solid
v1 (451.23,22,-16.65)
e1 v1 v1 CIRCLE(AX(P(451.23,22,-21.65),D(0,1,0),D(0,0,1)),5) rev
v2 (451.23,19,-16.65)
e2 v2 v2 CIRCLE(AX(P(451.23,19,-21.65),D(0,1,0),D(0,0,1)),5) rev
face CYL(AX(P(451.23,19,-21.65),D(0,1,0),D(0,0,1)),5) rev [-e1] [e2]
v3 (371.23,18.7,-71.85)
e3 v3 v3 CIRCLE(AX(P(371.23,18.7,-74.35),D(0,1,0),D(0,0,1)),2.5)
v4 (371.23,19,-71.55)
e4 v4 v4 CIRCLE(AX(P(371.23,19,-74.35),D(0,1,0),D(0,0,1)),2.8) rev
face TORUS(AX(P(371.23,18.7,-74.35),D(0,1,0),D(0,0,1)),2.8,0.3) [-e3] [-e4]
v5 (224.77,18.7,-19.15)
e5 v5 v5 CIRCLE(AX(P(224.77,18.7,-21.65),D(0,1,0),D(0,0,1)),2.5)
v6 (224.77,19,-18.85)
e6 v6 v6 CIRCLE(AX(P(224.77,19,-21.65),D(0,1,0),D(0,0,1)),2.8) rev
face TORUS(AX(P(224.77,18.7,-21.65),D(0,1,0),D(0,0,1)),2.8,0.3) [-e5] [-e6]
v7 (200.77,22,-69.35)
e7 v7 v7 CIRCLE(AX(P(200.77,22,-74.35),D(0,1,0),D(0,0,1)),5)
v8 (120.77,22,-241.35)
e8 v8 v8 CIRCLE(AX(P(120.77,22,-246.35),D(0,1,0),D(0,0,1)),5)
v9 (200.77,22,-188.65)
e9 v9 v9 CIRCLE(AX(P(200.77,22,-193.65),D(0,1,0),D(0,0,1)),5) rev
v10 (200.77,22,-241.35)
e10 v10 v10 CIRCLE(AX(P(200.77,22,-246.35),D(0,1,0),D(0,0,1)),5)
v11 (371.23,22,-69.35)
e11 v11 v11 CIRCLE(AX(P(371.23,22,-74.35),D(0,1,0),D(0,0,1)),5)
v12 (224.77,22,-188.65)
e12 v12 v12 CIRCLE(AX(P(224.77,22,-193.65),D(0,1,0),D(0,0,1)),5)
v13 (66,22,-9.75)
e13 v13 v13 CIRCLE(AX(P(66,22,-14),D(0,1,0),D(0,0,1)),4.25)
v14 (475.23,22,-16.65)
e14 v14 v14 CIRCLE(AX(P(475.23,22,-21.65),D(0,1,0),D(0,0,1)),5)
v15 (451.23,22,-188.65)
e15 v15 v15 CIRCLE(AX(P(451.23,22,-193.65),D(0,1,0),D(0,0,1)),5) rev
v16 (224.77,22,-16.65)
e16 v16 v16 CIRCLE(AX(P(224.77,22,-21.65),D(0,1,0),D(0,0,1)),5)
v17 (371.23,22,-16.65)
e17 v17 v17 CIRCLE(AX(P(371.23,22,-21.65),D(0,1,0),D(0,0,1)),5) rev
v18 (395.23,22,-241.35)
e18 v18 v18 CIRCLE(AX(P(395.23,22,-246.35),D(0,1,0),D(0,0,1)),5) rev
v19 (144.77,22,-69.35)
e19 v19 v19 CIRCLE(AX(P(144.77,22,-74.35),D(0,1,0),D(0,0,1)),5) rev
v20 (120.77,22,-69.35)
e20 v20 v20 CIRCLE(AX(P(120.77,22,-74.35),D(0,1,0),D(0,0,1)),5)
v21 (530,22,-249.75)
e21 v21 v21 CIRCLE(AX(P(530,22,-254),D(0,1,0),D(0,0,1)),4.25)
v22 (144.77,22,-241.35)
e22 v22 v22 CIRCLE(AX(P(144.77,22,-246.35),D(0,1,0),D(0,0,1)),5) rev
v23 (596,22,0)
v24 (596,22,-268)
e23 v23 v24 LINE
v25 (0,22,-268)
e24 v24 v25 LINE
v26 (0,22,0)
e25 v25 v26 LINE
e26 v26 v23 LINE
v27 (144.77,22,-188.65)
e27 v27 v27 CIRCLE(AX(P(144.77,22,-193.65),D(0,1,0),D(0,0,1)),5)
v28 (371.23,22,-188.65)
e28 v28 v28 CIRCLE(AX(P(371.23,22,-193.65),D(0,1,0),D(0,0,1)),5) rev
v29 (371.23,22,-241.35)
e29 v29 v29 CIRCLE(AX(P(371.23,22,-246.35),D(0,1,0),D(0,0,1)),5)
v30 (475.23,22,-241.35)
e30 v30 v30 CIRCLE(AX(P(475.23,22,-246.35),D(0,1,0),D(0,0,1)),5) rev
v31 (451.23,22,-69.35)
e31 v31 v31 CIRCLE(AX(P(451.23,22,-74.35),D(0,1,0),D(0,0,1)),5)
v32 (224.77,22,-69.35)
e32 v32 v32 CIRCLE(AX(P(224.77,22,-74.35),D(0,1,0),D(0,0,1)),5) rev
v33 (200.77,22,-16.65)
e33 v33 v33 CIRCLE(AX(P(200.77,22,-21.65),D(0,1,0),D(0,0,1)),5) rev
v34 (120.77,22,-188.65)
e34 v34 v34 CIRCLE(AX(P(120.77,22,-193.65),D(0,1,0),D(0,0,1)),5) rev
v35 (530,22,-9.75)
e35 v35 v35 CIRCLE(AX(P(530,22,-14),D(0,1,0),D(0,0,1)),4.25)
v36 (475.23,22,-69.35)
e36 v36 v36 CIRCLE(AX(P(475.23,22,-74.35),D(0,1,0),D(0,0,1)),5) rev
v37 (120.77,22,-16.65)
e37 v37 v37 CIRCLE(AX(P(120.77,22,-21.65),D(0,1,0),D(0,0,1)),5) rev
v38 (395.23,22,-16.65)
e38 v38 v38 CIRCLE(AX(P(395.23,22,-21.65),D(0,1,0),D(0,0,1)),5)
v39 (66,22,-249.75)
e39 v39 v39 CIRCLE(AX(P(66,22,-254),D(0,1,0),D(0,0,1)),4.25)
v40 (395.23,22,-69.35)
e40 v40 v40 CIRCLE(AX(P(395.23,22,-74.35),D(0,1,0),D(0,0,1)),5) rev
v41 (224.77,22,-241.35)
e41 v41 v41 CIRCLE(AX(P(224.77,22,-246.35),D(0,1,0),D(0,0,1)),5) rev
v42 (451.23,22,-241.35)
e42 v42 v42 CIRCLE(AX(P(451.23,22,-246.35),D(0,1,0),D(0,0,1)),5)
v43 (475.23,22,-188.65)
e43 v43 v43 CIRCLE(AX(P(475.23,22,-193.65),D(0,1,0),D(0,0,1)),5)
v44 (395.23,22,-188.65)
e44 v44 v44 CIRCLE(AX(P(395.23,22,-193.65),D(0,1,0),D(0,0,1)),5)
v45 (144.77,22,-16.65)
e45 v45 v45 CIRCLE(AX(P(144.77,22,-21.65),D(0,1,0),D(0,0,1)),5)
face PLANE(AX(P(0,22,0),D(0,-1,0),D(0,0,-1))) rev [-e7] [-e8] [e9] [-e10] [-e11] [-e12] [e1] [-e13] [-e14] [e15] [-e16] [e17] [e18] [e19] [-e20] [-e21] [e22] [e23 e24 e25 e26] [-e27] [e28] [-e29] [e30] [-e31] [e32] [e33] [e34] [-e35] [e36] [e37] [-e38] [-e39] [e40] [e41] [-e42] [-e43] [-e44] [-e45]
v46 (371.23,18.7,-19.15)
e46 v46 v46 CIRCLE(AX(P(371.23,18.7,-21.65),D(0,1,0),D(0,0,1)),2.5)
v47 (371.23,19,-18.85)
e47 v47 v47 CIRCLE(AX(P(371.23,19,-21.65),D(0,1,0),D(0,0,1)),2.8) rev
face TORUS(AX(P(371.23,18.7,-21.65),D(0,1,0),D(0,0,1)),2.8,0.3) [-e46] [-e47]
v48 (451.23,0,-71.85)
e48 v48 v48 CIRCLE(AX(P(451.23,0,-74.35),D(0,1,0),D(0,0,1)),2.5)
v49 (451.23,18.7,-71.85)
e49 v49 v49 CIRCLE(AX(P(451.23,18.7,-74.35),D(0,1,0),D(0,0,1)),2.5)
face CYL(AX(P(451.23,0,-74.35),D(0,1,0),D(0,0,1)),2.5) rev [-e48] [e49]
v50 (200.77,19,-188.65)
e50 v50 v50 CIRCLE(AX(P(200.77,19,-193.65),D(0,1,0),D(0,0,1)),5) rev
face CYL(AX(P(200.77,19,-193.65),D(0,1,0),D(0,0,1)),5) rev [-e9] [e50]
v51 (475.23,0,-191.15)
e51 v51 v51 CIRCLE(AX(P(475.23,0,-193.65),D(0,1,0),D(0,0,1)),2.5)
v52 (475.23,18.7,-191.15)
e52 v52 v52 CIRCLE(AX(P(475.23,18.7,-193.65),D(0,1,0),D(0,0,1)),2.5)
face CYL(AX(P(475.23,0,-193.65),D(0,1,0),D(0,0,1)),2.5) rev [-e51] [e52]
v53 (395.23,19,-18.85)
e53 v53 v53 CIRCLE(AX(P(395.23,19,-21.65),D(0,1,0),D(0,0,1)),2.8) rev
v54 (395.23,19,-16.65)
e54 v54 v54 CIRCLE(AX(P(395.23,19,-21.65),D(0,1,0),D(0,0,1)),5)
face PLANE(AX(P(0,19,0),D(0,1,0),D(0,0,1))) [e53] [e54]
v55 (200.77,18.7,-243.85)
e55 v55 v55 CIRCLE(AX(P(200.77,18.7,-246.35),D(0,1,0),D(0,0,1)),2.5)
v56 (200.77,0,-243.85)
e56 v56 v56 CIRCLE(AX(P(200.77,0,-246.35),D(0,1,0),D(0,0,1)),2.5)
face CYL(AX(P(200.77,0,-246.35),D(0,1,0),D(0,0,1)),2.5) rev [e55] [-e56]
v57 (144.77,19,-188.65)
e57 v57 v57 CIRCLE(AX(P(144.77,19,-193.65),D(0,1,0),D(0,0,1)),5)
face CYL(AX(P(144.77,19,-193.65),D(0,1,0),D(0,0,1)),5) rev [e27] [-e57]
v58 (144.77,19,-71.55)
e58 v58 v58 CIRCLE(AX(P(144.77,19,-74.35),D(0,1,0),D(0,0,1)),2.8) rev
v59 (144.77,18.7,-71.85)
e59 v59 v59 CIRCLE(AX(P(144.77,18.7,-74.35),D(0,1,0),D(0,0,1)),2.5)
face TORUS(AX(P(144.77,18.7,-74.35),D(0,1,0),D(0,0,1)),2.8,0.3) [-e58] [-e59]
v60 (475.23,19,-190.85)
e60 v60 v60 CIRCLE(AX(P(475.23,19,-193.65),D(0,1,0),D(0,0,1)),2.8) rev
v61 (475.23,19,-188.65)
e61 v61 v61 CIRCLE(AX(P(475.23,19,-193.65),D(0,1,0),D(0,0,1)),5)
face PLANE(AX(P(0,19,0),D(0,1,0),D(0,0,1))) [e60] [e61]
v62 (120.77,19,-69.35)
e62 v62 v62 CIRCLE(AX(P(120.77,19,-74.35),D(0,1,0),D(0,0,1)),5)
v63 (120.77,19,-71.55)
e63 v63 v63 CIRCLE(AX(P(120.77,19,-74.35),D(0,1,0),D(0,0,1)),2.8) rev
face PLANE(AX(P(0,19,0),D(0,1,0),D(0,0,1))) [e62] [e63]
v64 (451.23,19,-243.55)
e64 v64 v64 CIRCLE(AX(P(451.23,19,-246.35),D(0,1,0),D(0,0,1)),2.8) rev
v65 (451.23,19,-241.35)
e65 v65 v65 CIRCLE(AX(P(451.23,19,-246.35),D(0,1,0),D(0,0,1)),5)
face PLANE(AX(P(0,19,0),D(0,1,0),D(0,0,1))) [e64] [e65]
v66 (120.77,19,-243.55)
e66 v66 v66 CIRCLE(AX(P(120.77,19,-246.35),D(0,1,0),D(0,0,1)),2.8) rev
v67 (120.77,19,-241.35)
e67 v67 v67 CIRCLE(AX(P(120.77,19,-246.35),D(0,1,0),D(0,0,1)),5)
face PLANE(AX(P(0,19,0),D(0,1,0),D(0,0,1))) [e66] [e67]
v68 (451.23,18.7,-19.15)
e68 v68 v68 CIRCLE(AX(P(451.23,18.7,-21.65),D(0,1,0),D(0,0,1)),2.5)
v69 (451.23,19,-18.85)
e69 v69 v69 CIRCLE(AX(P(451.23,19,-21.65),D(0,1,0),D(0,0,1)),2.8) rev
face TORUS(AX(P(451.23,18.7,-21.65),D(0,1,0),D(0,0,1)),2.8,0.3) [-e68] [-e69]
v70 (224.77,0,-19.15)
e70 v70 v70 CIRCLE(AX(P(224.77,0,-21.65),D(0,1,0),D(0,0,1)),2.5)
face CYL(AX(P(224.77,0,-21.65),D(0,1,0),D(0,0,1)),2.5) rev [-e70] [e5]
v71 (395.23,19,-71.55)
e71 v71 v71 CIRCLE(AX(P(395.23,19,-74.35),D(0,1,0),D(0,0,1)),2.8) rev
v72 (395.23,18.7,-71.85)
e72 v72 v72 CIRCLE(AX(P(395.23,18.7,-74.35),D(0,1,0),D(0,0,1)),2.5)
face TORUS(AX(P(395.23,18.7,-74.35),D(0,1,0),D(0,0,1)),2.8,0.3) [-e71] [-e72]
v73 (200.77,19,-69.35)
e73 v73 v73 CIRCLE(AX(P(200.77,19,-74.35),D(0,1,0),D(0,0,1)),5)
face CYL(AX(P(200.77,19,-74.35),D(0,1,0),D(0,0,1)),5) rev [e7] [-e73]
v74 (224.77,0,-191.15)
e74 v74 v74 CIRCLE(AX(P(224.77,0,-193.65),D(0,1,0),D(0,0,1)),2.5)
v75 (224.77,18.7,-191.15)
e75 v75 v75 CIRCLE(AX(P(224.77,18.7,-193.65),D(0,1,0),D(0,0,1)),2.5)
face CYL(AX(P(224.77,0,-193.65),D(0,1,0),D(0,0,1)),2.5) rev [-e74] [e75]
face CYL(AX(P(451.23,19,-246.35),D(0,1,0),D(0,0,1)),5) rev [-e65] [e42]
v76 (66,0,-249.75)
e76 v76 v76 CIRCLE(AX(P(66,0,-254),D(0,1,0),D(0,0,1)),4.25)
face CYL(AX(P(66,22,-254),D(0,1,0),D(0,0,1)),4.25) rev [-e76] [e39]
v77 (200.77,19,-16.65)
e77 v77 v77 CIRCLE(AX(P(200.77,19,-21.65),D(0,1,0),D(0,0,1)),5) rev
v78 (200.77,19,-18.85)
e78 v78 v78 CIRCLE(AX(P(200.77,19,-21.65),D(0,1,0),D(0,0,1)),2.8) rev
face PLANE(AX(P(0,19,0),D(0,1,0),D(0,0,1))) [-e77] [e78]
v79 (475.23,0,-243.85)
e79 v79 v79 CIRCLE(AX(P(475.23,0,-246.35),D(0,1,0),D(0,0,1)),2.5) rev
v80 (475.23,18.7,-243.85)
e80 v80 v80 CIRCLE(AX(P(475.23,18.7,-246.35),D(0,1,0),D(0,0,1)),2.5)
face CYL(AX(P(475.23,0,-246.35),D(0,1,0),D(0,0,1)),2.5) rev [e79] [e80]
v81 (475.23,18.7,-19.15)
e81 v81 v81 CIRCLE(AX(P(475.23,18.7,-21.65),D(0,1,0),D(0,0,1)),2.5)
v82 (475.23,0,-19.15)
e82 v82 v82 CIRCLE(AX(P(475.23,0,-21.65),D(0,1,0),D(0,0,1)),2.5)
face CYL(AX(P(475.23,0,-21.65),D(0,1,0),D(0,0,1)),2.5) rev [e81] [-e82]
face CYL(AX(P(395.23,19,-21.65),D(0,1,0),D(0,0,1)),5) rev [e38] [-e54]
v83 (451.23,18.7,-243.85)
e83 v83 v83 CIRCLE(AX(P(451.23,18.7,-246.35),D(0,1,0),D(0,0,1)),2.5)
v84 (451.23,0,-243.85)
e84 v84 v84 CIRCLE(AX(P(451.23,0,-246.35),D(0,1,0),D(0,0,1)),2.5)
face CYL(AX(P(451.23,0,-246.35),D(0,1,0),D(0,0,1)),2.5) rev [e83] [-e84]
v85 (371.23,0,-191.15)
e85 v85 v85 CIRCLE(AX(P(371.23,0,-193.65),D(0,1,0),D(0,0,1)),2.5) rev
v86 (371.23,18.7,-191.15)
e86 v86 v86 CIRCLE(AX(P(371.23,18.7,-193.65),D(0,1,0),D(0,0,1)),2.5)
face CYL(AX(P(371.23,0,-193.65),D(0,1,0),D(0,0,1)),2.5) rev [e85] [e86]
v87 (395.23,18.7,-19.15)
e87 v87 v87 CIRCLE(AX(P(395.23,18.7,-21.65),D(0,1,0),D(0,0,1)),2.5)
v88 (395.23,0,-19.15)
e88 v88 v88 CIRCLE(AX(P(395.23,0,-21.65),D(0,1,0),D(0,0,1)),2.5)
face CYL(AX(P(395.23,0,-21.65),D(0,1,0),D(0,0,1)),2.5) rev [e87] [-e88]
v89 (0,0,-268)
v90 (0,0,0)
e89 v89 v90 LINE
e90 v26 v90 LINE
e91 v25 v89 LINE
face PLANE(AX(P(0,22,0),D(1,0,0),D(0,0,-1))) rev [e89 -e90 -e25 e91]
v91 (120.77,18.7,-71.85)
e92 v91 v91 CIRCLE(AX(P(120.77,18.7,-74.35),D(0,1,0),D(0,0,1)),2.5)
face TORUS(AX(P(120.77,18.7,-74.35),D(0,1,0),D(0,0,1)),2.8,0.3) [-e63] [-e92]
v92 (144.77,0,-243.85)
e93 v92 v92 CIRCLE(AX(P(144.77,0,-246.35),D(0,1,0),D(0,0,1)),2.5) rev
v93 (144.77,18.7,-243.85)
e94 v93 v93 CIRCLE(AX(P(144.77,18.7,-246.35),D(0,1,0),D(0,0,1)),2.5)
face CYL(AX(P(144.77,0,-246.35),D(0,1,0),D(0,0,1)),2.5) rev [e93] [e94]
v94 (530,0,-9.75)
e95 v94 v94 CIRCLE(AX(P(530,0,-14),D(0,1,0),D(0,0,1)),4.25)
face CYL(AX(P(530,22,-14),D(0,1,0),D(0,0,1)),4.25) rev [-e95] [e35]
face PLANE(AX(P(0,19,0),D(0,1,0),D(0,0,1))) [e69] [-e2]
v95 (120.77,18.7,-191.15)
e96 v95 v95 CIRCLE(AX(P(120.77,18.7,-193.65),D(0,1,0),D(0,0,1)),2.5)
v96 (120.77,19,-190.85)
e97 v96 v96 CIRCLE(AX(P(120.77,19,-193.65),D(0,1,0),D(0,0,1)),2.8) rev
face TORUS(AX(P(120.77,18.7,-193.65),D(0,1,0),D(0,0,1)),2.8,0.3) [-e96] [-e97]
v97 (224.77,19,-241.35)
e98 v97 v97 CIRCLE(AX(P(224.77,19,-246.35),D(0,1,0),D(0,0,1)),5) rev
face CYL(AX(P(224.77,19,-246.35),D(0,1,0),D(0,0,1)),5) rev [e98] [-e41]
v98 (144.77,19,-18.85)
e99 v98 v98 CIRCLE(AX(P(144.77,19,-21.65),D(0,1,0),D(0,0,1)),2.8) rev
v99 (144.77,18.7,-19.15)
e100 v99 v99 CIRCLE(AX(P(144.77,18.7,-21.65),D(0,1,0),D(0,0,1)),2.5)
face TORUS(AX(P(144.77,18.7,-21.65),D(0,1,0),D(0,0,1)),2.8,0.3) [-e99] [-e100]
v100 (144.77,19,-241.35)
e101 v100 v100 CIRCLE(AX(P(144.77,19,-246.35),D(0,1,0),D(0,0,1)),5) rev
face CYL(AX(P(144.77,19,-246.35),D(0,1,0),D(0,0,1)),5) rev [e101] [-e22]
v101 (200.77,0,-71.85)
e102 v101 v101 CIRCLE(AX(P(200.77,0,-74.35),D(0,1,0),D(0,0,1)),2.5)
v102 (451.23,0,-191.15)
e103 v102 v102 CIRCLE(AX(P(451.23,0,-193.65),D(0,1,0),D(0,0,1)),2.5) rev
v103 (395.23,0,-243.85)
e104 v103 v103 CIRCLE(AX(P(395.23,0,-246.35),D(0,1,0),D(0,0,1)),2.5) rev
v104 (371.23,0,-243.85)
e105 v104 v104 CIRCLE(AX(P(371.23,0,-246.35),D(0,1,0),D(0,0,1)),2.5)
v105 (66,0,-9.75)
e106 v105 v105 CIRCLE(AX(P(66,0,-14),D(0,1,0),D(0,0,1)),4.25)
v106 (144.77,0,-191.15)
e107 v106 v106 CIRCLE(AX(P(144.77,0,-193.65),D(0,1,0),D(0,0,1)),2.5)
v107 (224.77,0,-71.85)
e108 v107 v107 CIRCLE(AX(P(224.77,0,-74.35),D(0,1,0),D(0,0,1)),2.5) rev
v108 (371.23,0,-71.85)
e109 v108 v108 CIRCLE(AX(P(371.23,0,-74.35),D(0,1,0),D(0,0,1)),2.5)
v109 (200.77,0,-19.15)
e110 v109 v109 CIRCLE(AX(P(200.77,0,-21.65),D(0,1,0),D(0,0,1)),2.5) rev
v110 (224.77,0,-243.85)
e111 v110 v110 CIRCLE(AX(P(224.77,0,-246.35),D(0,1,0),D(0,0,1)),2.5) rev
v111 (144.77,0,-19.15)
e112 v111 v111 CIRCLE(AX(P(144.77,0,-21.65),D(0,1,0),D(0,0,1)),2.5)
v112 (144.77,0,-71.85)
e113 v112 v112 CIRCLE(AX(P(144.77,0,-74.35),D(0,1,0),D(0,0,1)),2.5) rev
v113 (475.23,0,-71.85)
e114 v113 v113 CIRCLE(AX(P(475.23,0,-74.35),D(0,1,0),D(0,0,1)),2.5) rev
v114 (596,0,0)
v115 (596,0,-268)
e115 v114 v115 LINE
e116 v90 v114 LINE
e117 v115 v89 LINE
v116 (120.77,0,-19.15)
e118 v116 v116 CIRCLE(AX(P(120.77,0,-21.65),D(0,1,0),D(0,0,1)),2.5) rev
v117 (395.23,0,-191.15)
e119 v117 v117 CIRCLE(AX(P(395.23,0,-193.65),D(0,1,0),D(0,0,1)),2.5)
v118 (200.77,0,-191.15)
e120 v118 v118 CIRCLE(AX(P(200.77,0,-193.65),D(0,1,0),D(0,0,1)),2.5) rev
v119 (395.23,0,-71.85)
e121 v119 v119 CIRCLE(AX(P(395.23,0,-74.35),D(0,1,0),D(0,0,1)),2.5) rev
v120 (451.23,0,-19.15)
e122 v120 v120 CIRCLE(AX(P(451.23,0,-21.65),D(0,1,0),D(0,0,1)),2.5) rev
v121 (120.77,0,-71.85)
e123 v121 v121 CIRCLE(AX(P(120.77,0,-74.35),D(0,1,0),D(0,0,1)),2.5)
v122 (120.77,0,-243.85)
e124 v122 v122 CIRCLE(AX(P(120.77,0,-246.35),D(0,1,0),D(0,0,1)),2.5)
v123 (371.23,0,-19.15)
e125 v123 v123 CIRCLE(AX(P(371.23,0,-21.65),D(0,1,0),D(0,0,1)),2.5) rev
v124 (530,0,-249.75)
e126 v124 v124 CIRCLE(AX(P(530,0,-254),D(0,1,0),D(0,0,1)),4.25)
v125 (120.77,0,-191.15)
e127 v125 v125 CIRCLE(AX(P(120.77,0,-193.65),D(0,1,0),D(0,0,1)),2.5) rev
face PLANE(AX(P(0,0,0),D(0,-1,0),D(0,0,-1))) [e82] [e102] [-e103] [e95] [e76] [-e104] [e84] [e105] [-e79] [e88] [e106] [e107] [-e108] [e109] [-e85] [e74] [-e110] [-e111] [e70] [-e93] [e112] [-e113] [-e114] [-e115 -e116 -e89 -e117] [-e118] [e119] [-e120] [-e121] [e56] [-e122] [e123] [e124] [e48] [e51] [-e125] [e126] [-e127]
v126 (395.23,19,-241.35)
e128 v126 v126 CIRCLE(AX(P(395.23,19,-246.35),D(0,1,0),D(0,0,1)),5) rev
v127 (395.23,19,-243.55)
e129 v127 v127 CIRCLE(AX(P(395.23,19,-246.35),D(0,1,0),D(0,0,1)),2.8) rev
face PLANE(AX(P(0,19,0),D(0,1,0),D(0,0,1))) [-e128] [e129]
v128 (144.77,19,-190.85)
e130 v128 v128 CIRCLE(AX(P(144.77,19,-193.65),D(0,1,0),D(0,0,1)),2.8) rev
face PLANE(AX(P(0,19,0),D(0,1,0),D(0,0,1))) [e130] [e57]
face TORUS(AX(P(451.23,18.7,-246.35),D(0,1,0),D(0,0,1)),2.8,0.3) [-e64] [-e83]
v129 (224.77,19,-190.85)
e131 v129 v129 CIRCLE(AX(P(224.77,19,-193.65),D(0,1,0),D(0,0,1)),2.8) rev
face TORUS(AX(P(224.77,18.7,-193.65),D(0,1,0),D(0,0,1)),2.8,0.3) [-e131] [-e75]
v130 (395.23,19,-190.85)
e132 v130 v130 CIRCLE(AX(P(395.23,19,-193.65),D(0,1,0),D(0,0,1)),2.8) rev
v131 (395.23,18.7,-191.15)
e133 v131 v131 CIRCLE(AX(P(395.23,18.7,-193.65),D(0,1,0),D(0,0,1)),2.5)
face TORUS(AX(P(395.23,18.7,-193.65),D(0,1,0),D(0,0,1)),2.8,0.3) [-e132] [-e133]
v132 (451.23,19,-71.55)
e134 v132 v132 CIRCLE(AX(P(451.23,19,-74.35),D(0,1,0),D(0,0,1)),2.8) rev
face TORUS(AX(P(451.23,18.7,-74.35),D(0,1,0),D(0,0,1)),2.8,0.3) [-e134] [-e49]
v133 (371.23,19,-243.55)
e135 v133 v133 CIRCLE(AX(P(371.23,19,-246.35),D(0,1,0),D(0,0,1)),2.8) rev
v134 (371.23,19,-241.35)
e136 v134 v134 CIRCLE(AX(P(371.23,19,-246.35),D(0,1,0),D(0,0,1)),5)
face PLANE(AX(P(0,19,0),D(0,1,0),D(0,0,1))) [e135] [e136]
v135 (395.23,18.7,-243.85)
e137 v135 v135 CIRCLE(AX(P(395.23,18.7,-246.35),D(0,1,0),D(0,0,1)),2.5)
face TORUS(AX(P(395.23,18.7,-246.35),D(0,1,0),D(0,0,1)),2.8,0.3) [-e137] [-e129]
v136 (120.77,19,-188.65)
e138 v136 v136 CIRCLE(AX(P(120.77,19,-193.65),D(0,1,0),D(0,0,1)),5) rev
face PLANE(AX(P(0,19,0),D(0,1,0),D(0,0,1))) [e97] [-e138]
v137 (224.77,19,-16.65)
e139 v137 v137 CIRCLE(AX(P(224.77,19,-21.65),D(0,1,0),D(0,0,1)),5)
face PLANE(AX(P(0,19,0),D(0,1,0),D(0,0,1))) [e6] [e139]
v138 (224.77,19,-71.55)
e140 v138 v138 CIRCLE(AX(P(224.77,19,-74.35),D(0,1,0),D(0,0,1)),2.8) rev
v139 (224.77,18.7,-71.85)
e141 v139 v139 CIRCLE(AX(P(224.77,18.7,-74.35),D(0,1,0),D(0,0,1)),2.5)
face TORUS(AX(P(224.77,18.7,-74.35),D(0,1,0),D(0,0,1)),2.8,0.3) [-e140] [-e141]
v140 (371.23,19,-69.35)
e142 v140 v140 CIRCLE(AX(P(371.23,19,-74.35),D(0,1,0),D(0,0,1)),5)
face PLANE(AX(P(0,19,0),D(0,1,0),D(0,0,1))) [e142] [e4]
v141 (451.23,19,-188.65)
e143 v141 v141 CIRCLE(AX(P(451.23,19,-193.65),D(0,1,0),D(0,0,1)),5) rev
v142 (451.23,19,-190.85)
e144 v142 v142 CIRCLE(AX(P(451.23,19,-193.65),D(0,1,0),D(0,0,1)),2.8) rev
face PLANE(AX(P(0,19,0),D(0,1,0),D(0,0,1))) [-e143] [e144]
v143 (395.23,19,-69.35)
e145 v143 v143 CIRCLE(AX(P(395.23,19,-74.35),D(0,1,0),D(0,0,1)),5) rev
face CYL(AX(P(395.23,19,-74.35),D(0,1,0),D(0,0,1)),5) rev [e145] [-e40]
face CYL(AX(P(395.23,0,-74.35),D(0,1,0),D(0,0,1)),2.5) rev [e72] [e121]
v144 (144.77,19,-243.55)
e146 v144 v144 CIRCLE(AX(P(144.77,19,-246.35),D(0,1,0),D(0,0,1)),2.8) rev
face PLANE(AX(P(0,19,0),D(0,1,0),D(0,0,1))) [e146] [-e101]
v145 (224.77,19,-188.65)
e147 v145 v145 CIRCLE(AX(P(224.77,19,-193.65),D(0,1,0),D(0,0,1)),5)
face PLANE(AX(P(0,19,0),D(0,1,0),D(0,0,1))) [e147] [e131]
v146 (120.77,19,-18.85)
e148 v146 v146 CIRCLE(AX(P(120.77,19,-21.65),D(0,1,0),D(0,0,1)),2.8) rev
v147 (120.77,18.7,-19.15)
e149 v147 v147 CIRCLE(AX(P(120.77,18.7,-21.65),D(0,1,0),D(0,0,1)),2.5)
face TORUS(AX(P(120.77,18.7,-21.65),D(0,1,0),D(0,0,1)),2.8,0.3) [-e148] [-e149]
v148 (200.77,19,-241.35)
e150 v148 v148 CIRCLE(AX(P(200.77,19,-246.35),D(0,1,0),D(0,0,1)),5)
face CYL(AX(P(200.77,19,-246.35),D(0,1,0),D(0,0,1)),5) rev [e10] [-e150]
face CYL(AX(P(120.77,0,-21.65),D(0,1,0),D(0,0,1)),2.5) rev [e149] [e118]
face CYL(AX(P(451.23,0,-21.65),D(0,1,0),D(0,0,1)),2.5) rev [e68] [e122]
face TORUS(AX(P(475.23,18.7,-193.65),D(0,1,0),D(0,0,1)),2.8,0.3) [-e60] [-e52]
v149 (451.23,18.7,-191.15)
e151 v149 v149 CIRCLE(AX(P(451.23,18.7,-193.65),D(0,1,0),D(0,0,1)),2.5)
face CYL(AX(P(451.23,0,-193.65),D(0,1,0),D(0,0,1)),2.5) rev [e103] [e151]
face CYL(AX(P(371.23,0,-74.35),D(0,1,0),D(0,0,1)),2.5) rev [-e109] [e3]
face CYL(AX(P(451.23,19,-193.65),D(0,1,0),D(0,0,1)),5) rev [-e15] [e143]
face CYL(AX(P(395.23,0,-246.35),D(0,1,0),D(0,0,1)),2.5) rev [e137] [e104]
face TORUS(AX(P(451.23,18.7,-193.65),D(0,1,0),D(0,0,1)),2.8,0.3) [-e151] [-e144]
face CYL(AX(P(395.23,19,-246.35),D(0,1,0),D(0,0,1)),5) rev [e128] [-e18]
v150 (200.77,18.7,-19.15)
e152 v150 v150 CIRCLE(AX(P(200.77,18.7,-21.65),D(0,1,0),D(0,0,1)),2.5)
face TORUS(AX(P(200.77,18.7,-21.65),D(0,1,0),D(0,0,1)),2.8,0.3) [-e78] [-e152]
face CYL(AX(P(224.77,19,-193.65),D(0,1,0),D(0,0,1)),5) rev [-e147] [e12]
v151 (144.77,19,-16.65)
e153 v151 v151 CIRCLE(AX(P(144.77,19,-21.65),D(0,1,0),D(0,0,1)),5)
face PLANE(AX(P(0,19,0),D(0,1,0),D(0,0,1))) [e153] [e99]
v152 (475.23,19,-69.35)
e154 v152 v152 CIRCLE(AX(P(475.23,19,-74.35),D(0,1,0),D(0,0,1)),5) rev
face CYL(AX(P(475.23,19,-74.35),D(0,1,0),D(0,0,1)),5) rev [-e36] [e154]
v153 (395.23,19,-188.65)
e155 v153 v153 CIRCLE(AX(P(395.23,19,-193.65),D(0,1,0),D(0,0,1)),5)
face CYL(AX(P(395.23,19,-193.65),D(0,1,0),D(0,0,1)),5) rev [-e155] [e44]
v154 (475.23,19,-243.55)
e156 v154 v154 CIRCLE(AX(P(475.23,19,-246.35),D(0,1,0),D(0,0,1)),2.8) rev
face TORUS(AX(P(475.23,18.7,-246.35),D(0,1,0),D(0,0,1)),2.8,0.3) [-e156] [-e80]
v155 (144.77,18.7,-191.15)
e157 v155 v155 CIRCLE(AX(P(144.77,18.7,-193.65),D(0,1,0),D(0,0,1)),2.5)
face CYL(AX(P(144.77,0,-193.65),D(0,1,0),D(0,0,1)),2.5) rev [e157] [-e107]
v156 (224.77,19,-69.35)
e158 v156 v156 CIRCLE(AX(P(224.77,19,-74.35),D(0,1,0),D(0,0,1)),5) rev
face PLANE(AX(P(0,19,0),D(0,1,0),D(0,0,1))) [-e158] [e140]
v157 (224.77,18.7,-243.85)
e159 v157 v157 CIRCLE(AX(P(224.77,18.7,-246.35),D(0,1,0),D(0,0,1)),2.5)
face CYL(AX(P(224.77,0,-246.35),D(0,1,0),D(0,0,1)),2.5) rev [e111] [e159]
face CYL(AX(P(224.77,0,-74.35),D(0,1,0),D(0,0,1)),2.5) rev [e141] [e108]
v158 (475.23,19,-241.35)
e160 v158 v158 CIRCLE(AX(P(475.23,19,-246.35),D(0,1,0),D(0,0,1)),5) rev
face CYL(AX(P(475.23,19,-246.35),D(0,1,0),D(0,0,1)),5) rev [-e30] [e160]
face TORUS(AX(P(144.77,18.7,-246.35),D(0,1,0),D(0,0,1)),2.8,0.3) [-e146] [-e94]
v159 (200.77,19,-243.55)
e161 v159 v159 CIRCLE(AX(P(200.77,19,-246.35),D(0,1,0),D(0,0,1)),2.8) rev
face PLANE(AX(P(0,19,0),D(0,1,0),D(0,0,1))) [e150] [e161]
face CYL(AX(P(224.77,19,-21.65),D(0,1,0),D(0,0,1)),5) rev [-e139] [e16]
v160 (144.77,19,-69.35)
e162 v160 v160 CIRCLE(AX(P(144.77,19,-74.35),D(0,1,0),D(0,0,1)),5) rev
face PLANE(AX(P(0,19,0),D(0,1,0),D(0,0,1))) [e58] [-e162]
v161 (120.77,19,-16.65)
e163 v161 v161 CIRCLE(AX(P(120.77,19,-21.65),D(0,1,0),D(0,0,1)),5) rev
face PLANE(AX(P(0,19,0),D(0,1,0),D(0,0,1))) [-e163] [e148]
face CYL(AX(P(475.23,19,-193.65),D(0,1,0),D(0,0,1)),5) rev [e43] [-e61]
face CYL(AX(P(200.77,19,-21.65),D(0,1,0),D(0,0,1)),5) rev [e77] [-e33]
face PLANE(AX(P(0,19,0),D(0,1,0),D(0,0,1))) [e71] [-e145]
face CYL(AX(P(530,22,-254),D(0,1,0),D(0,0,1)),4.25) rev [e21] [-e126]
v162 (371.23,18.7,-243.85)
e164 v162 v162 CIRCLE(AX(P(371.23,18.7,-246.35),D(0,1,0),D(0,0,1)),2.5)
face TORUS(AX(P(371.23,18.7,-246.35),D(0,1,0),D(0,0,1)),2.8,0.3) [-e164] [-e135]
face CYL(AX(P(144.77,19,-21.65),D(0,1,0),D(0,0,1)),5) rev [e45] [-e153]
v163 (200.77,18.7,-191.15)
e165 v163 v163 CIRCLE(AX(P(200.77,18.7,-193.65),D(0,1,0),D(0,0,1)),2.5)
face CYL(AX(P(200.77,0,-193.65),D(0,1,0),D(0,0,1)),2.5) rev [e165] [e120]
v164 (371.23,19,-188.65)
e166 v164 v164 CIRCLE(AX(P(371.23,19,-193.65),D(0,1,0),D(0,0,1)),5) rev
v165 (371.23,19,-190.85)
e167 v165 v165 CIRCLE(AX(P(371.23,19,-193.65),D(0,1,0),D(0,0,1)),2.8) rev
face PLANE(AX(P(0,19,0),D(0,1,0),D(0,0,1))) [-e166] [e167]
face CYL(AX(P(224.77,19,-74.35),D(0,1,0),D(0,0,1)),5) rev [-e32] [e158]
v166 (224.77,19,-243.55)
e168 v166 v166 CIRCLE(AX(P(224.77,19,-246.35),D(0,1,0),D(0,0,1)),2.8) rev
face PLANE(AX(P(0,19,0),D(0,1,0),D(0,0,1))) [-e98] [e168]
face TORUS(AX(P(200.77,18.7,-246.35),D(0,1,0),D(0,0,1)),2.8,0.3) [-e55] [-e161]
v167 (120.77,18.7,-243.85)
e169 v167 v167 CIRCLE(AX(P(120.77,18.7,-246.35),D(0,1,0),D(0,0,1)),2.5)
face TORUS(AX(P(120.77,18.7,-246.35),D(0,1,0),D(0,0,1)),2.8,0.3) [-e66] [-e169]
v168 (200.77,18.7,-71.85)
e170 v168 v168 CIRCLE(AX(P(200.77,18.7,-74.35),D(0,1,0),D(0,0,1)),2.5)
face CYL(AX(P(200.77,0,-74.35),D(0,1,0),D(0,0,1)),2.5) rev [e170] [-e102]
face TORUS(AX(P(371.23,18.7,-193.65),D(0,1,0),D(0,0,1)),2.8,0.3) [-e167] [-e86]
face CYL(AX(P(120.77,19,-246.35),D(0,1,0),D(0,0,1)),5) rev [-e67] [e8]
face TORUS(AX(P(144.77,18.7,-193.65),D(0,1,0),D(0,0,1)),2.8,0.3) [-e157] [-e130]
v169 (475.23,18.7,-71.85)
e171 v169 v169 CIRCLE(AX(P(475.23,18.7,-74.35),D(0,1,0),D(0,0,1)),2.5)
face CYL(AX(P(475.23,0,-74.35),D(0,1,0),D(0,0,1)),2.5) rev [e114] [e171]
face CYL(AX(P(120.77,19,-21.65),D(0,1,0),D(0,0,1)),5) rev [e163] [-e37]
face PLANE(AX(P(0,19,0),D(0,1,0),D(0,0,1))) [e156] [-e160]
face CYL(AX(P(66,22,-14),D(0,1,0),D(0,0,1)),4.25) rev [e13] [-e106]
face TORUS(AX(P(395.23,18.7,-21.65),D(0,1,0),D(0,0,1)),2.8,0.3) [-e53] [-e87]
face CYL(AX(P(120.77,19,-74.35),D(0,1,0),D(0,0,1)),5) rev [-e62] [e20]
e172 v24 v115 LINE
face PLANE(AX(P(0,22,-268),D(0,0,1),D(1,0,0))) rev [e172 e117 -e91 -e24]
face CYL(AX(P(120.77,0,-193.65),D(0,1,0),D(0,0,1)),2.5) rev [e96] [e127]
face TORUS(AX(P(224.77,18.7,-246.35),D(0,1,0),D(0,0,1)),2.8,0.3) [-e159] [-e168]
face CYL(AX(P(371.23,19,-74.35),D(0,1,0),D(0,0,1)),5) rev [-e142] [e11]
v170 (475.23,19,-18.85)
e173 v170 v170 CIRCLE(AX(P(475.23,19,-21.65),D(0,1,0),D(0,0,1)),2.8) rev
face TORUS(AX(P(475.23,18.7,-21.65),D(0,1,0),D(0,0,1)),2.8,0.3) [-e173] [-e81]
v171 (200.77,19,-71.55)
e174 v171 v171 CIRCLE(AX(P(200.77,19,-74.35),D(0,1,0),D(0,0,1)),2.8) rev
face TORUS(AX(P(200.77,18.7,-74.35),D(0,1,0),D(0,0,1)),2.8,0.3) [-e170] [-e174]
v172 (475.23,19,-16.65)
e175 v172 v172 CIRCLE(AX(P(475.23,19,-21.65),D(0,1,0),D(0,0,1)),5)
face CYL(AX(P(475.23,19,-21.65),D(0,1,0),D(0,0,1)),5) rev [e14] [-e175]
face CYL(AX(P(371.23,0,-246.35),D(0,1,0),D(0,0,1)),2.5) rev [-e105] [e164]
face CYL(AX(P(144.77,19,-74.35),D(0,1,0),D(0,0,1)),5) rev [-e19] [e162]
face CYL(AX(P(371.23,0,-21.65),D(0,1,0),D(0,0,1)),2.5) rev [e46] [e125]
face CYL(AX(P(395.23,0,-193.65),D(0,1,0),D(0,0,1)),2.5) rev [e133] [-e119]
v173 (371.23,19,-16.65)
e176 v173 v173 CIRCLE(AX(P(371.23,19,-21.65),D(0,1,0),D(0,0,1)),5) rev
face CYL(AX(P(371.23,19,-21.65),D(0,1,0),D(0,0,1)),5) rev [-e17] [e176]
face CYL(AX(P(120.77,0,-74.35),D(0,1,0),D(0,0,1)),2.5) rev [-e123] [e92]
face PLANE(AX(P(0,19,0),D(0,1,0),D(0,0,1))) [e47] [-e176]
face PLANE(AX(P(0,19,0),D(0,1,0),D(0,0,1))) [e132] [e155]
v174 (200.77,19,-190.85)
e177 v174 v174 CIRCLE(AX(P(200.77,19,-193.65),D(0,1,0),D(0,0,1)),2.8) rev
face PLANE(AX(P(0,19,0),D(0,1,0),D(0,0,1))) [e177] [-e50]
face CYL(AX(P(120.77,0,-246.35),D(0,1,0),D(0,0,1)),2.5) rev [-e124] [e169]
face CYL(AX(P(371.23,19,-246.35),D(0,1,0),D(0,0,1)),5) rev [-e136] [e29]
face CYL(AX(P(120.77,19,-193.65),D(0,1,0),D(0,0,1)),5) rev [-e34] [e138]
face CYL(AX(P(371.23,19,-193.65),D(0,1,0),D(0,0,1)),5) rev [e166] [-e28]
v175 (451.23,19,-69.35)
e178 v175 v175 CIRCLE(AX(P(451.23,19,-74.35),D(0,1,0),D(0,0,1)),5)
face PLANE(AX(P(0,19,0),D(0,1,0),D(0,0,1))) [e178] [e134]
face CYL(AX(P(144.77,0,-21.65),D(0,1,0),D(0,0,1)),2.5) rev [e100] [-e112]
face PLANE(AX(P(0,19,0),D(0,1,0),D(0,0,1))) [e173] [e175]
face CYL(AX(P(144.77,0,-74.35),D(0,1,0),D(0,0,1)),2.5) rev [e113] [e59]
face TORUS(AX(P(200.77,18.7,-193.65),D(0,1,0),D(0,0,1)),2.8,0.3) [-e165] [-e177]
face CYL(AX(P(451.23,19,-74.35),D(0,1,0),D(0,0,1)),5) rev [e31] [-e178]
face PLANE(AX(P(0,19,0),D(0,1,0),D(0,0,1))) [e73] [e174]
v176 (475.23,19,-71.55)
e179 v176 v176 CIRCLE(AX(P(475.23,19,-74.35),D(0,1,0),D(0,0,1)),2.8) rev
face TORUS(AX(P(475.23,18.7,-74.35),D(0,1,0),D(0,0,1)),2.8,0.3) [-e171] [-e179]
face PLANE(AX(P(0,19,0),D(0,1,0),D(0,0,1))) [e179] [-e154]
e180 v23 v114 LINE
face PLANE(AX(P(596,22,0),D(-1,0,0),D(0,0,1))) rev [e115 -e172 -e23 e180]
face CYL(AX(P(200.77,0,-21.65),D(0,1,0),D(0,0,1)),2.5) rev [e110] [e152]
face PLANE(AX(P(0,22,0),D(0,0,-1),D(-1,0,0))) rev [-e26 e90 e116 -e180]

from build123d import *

# Parameters (mm, degrees)
SZKIC1_W                       = 596
SZKIC1_H                       = 268
DODANIE_WYCI_GNI_CIE1_DEPTH    = 22
OTW_R_GWINTOWANY_M101_D        = 8.5
SZKIC7_R                       = 5
SZKIC7_R_2                     = 2.5
WYTNIJ_WYCI_GNI_CIE4_DEPTH     = 3
WYTNIJ_WYCI_GNI_CIE5_OUTLINE_R = 2.5
WYTNIJ_WYCI_GNI_CIE5_DEPTH     = 22
ZAOKR_GLENIE2_R                = 0.3


# Read off the part's stored shape, not the designer's step: Wytnij-wyciągnięcie5
with BuildPart() as part:
    # Szkic1 → Dodanie-wyciągnięcie1 (new body)
    with BuildSketch(Plane(origin=(0, 0, 0), x_dir=(1, 0, 0), z_dir=(0, 1, 0))):
        with Locations((298, 134)):
            Rectangle(SZKIC1_W, SZKIC1_H)
    extrude(amount=DODANIE_WYCI_GNI_CIE1_DEPTH)

    # Otwór gwintowany M101 (through all)
    with Locations(Plane(origin=(66, 22, -254), x_dir=(0, 0, 1), z_dir=(0, 1, 0))):
        with Locations((0, 0), (240, 0), (240, 464), (0, 464)):
            Hole(OTW_R_GWINTOWANY_M101_D / 2)

    # Szkic7 → Wytnij-wyciągnięcie4 (cut)
    # profile 1 of 32: a face of its own
    with BuildSketch(Plane(origin=(0, 22, 0), x_dir=(1, 0, 0), z_dir=(0, 1, 0))):
        with Locations(Location((120.77, 246.35, 0), (0, 0, 270))):
            Circle(SZKIC7_R)
        with Locations(Location((120.77, 246.35, 0), (0, 0, 270))):
            Circle(SZKIC7_R_2, mode=Mode.SUBTRACT)
    # profile 2 of 32: a face of its own
    with BuildSketch(Plane(origin=(0, 22, 0), x_dir=(1, 0, 0), z_dir=(0, 1, 0))):
        with Locations(Location((144.77, 246.35, 0), (0, 0, 270))):
            Circle(SZKIC7_R)
        with Locations(Location((144.77, 246.35, 0), (0, 0, 270))):
            Circle(SZKIC7_R_2, mode=Mode.SUBTRACT)
    # profile 3 of 32: a face of its own
    with BuildSketch(Plane(origin=(0, 22, 0), x_dir=(1, 0, 0), z_dir=(0, 1, 0))):
        with Locations(Location((120.77, 193.65, 0), (0, 0, 270))):
            Circle(SZKIC7_R)
        with Locations(Location((120.77, 193.65, 0), (0, 0, 270))):
            Circle(SZKIC7_R_2, mode=Mode.SUBTRACT)
    # profile 4 of 32: a face of its own
    with BuildSketch(Plane(origin=(0, 22, 0), x_dir=(1, 0, 0), z_dir=(0, 1, 0))):
        with Locations(Location((144.77, 193.65, 0), (0, 0, 270))):
            Circle(SZKIC7_R)
        with Locations(Location((144.77, 193.65, 0), (0, 0, 270))):
            Circle(SZKIC7_R_2, mode=Mode.SUBTRACT)
    # profile 5 of 32: a face of its own
    with BuildSketch(Plane(origin=(0, 22, 0), x_dir=(1, 0, 0), z_dir=(0, 1, 0))):
        with Locations(Location((200.77, 193.65, 0), (0, 0, 270))):
            Circle(SZKIC7_R)
        with Locations(Location((200.77, 193.65, 0), (0, 0, 270))):
            Circle(SZKIC7_R_2, mode=Mode.SUBTRACT)
    # profile 6 of 32: a face of its own
    with BuildSketch(Plane(origin=(0, 22, 0), x_dir=(1, 0, 0), z_dir=(0, 1, 0))):
        with Locations(Location((200.77, 246.35, 0), (0, 0, 270))):
            Circle(SZKIC7_R)
        with Locations(Location((200.77, 246.35, 0), (0, 0, 270))):
            Circle(SZKIC7_R_2, mode=Mode.SUBTRACT)
    # profile 7 of 32: a face of its own
    with BuildSketch(Plane(origin=(0, 22, 0), x_dir=(1, 0, 0), z_dir=(0, 1, 0))):
        with Locations(Location((224.77, 193.65, 0), (0, 0, 270))):
            Circle(SZKIC7_R)
        with Locations(Location((224.77, 193.65, 0), (0, 0, 270))):
            Circle(SZKIC7_R_2, mode=Mode.SUBTRACT)
    # profile 8 of 32: a face of its own
    with BuildSketch(Plane(origin=(0, 22, 0), x_dir=(1, 0, 0), z_dir=(0, 1, 0))):
        with Locations(Location((224.77, 246.35, 0), (0, 0, 270))):
            Circle(SZKIC7_R)
        with Locations(Location((224.77, 246.35, 0), (0, 0, 270))):
            Circle(SZKIC7_R_2, mode=Mode.SUBTRACT)
    # profile 9 of 32: a face of its own
    with BuildSketch(Plane(origin=(0, 22, 0), x_dir=(1, 0, 0), z_dir=(0, 1, 0))):
        with Locations(Location((120.77, 74.35, 0), (0, 0, 270))):
            Circle(SZKIC7_R)
        with Locations(Location((120.77, 74.35, 0), (0, 0, 270))):
            Circle(SZKIC7_R_2, mode=Mode.SUBTRACT)
    # profile 10 of 32: a face of its own
    with BuildSketch(Plane(origin=(0, 22, 0), x_dir=(1, 0, 0), z_dir=(0, 1, 0))):
        with Locations(Location((120.77, 21.65, 0), (0, 0, 270))):
            Circle(SZKIC7_R)
        with Locations(Location((120.77, 21.65, 0), (0, 0, 270))):
            Circle(SZKIC7_R_2, mode=Mode.SUBTRACT)
    # profile 11 of 32: a face of its own
    with BuildSketch(Plane(origin=(0, 22, 0), x_dir=(1, 0, 0), z_dir=(0, 1, 0))):
        with Locations(Location((144.77, 21.65, 0), (0, 0, 270))):
            Circle(SZKIC7_R)
        with Locations(Location((144.77, 21.65, 0), (0, 0, 270))):
            Circle(SZKIC7_R_2, mode=Mode.SUBTRACT)
    # profile 12 of 32: a face of its own
    with BuildSketch(Plane(origin=(0, 22, 0), x_dir=(1, 0, 0), z_dir=(0, 1, 0))):
        with Locations(Location((144.77, 74.35, 0), (0, 0, 270))):
            Circle(SZKIC7_R)
        with Locations(Location((144.77, 74.35, 0), (0, 0, 270))):
            Circle(SZKIC7_R_2, mode=Mode.SUBTRACT)
    # profile 13 of 32: a face of its own
    with BuildSketch(Plane(origin=(0, 22, 0), x_dir=(1, 0, 0), z_dir=(0, 1, 0))):
        with Locations(Location((200.77, 74.35, 0), (0, 0, 270))):
            Circle(SZKIC7_R)
        with Locations(Location((200.77, 74.35, 0), (0, 0, 270))):
            Circle(SZKIC7_R_2, mode=Mode.SUBTRACT)
    # profile 14 of 32: a face of its own
    with BuildSketch(Plane(origin=(0, 22, 0), x_dir=(1, 0, 0), z_dir=(0, 1, 0))):
        with Locations(Location((224.77, 74.35, 0), (0, 0, 270))):
            Circle(SZKIC7_R)
        with Locations(Location((224.77, 74.35, 0), (0, 0, 270))):
            Circle(SZKIC7_R_2, mode=Mode.SUBTRACT)
    # profile 15 of 32: a face of its own
    with BuildSketch(Plane(origin=(0, 22, 0), x_dir=(1, 0, 0), z_dir=(0, 1, 0))):
        with Locations(Location((200.77, 21.65, 0), (0, 0, 270))):
            Circle(SZKIC7_R)
        with Locations(Location((200.77, 21.65, 0), (0, 0, 270))):
            Circle(SZKIC7_R_2, mode=Mode.SUBTRACT)
    # profile 16 of 32: a face of its own
    with BuildSketch(Plane(origin=(0, 22, 0), x_dir=(1, 0, 0), z_dir=(0, 1, 0))):
        with Locations(Location((224.77, 21.65, 0), (0, 0, 270))):
            Circle(SZKIC7_R)
        with Locations(Location((224.77, 21.65, 0), (0, 0, 270))):
            Circle(SZKIC7_R_2, mode=Mode.SUBTRACT)
    # profile 17 of 32: a face of its own
    with BuildSketch(Plane(origin=(0, 22, 0), x_dir=(1, 0, 0), z_dir=(0, 1, 0))):
        with Locations(Location((371.23, 246.35, 0), (0, 0, 270))):
            Circle(SZKIC7_R)
        with Locations(Location((371.23, 246.35, 0), (0, 0, 270))):
            Circle(SZKIC7_R_2, mode=Mode.SUBTRACT)
    # profile 18 of 32: a face of its own
    with BuildSketch(Plane(origin=(0, 22, 0), x_dir=(1, 0, 0), z_dir=(0, 1, 0))):
        with Locations(Location((395.23, 246.35, 0), (0, 0, 270))):
            Circle(SZKIC7_R)
        with Locations(Location((395.23, 246.35, 0), (0, 0, 270))):
            Circle(SZKIC7_R_2, mode=Mode.SUBTRACT)
    # profile 19 of 32: a face of its own
    with BuildSketch(Plane(origin=(0, 22, 0), x_dir=(1, 0, 0), z_dir=(0, 1, 0))):
        with Locations(Location((371.23, 193.65, 0), (0, 0, 270))):
            Circle(SZKIC7_R)
        with Locations(Location((371.23, 193.65, 0), (0, 0, 270))):
            Circle(SZKIC7_R_2, mode=Mode.SUBTRACT)
    # profile 20 of 32: a face of its own
    with BuildSketch(Plane(origin=(0, 22, 0), x_dir=(1, 0, 0), z_dir=(0, 1, 0))):
        with Locations(Location((395.23, 193.65, 0), (0, 0, 270))):
            Circle(SZKIC7_R)
        with Locations(Location((395.23, 193.65, 0), (0, 0, 270))):
            Circle(SZKIC7_R_2, mode=Mode.SUBTRACT)
    # profile 21 of 32: a face of its own
    with BuildSketch(Plane(origin=(0, 22, 0), x_dir=(1, 0, 0), z_dir=(0, 1, 0))):
        with Locations(Location((451.23, 193.65, 0), (0, 0, 270))):
            Circle(SZKIC7_R)
        with Locations(Location((451.23, 193.65, 0), (0, 0, 270))):
            Circle(SZKIC7_R_2, mode=Mode.SUBTRACT)
    # profile 22 of 32: a face of its own
    with BuildSketch(Plane(origin=(0, 22, 0), x_dir=(1, 0, 0), z_dir=(0, 1, 0))):
        with Locations(Location((475.23, 193.65, 0), (0, 0, 270))):
            Circle(SZKIC7_R)
        with Locations(Location((475.23, 193.65, 0), (0, 0, 270))):
            Circle(SZKIC7_R_2, mode=Mode.SUBTRACT)
    # profile 23 of 32: a face of its own
    with BuildSketch(Plane(origin=(0, 22, 0), x_dir=(1, 0, 0), z_dir=(0, 1, 0))):
        with Locations(Location((451.23, 246.35, 0), (0, 0, 270))):
            Circle(SZKIC7_R)
        with Locations(Location((451.23, 246.35, 0), (0, 0, 270))):
            Circle(SZKIC7_R_2, mode=Mode.SUBTRACT)
    # profile 24 of 32: a face of its own
    with BuildSketch(Plane(origin=(0, 22, 0), x_dir=(1, 0, 0), z_dir=(0, 1, 0))):
        with Locations(Location((475.23, 246.35, 0), (0, 0, 270))):
            Circle(SZKIC7_R)
        with Locations(Location((475.23, 246.35, 0), (0, 0, 270))):
            Circle(SZKIC7_R_2, mode=Mode.SUBTRACT)
    # profile 25 of 32: a face of its own
    with BuildSketch(Plane(origin=(0, 22, 0), x_dir=(1, 0, 0), z_dir=(0, 1, 0))):
        with Locations(Location((371.23, 74.35, 0), (0, 0, 270))):
            Circle(SZKIC7_R)
        with Locations(Location((371.23, 74.35, 0), (0, 0, 270))):
            Circle(SZKIC7_R_2, mode=Mode.SUBTRACT)
    # profile 26 of 32: a face of its own
    with BuildSketch(Plane(origin=(0, 22, 0), x_dir=(1, 0, 0), z_dir=(0, 1, 0))):
        with Locations(Location((395.23, 74.35, 0), (0, 0, 270))):
            Circle(SZKIC7_R)
        with Locations(Location((395.23, 74.35, 0), (0, 0, 270))):
            Circle(SZKIC7_R_2, mode=Mode.SUBTRACT)
    # profile 27 of 32: a face of its own
    with BuildSketch(Plane(origin=(0, 22, 0), x_dir=(1, 0, 0), z_dir=(0, 1, 0))):
        with Locations(Location((451.23, 74.35, 0), (0, 0, 270))):
            Circle(SZKIC7_R)
        with Locations(Location((451.23, 74.35, 0), (0, 0, 270))):
            Circle(SZKIC7_R_2, mode=Mode.SUBTRACT)
    # profile 28 of 32: a face of its own
    with BuildSketch(Plane(origin=(0, 22, 0), x_dir=(1, 0, 0), z_dir=(0, 1, 0))):
        with Locations(Location((475.23, 74.35, 0), (0, 0, 270))):
            Circle(SZKIC7_R)
        with Locations(Location((475.23, 74.35, 0), (0, 0, 270))):
            Circle(SZKIC7_R_2, mode=Mode.SUBTRACT)
    # profile 29 of 32: a face of its own
    with BuildSketch(Plane(origin=(0, 22, 0), x_dir=(1, 0, 0), z_dir=(0, 1, 0))):
        with Locations(Location((371.23, 21.65, 0), (0, 0, 270))):
            Circle(SZKIC7_R)
        with Locations(Location((371.23, 21.65, 0), (0, 0, 270))):
            Circle(SZKIC7_R_2, mode=Mode.SUBTRACT)
    # profile 30 of 32: a face of its own
    with BuildSketch(Plane(origin=(0, 22, 0), x_dir=(1, 0, 0), z_dir=(0, 1, 0))):
        with Locations(Location((395.23, 21.65, 0), (0, 0, 270))):
            Circle(SZKIC7_R)
        with Locations(Location((395.23, 21.65, 0), (0, 0, 270))):
            Circle(SZKIC7_R_2, mode=Mode.SUBTRACT)
    # profile 31 of 32: a face of its own
    with BuildSketch(Plane(origin=(0, 22, 0), x_dir=(1, 0, 0), z_dir=(0, 1, 0))):
        with Locations(Location((451.23, 21.65, 0), (0, 0, 270))):
            Circle(SZKIC7_R)
        with Locations(Location((451.23, 21.65, 0), (0, 0, 270))):
            Circle(SZKIC7_R_2, mode=Mode.SUBTRACT)
    # profile 32 of 32: a face of its own
    with BuildSketch(Plane(origin=(0, 22, 0), x_dir=(1, 0, 0), z_dir=(0, 1, 0))):
        with Locations(Location((475.23, 21.65, 0), (0, 0, 270))):
            Circle(SZKIC7_R)
        with Locations(Location((475.23, 21.65, 0), (0, 0, 270))):
            Circle(SZKIC7_R_2, mode=Mode.SUBTRACT)
    extrude(amount=-WYTNIJ_WYCI_GNI_CIE4_DEPTH, mode=Mode.SUBTRACT)

    # Wytnij-wyciągnięcie5 outline → Wytnij-wyciągnięcie5 (cut)
    with BuildSketch(Plane(origin=(0, 0, 0), x_dir=(1, 0, 0), z_dir=(0, 1, 0))):
        with Locations((120.77, 74.35)):
            Circle(WYTNIJ_WYCI_GNI_CIE5_OUTLINE_R)
        with Locations((144.77, 74.35)):
            Circle(WYTNIJ_WYCI_GNI_CIE5_OUTLINE_R)
        with Locations((120.77, 21.65)):
            Circle(WYTNIJ_WYCI_GNI_CIE5_OUTLINE_R)
        with Locations((144.77, 21.65)):
            Circle(WYTNIJ_WYCI_GNI_CIE5_OUTLINE_R)
        with Locations((200.77, 74.35)):
            Circle(WYTNIJ_WYCI_GNI_CIE5_OUTLINE_R)
        with Locations((224.77, 74.35)):
            Circle(WYTNIJ_WYCI_GNI_CIE5_OUTLINE_R)
        with Locations((200.77, 21.65)):
            Circle(WYTNIJ_WYCI_GNI_CIE5_OUTLINE_R)
        with Locations((224.77, 21.65)):
            Circle(WYTNIJ_WYCI_GNI_CIE5_OUTLINE_R)
        with Locations((120.77, 193.65)):
            Circle(WYTNIJ_WYCI_GNI_CIE5_OUTLINE_R)
        with Locations((120.77, 246.35)):
            Circle(WYTNIJ_WYCI_GNI_CIE5_OUTLINE_R)
        with Locations((144.77, 246.35)):
            Circle(WYTNIJ_WYCI_GNI_CIE5_OUTLINE_R)
        with Locations((144.77, 193.65)):
            Circle(WYTNIJ_WYCI_GNI_CIE5_OUTLINE_R)
        with Locations((200.77, 193.65)):
            Circle(WYTNIJ_WYCI_GNI_CIE5_OUTLINE_R)
        with Locations((200.77, 246.35)):
            Circle(WYTNIJ_WYCI_GNI_CIE5_OUTLINE_R)
        with Locations((224.77, 246.35)):
            Circle(WYTNIJ_WYCI_GNI_CIE5_OUTLINE_R)
        with Locations((224.77, 193.65)):
            Circle(WYTNIJ_WYCI_GNI_CIE5_OUTLINE_R)
        with Locations((371.23, 246.35)):
            Circle(WYTNIJ_WYCI_GNI_CIE5_OUTLINE_R)
        with Locations((395.23, 246.35)):
            Circle(WYTNIJ_WYCI_GNI_CIE5_OUTLINE_R)
        with Locations((451.23, 246.35)):
            Circle(WYTNIJ_WYCI_GNI_CIE5_OUTLINE_R)
        with Locations((475.23, 246.35)):
            Circle(WYTNIJ_WYCI_GNI_CIE5_OUTLINE_R)
        with Locations((451.23, 193.65)):
            Circle(WYTNIJ_WYCI_GNI_CIE5_OUTLINE_R)
        with Locations((475.23, 193.65)):
            Circle(WYTNIJ_WYCI_GNI_CIE5_OUTLINE_R)
        with Locations((395.23, 193.65)):
            Circle(WYTNIJ_WYCI_GNI_CIE5_OUTLINE_R)
        with Locations((371.23, 193.65)):
            Circle(WYTNIJ_WYCI_GNI_CIE5_OUTLINE_R)
        with Locations((371.23, 74.35)):
            Circle(WYTNIJ_WYCI_GNI_CIE5_OUTLINE_R)
        with Locations((395.23, 74.35)):
            Circle(WYTNIJ_WYCI_GNI_CIE5_OUTLINE_R)
        with Locations((371.23, 21.65)):
            Circle(WYTNIJ_WYCI_GNI_CIE5_OUTLINE_R)
        with Locations((395.23, 21.65)):
            Circle(WYTNIJ_WYCI_GNI_CIE5_OUTLINE_R)
        with Locations((451.23, 21.65)):
            Circle(WYTNIJ_WYCI_GNI_CIE5_OUTLINE_R)
        with Locations((451.23, 74.35)):
            Circle(WYTNIJ_WYCI_GNI_CIE5_OUTLINE_R)
        with Locations((475.23, 74.35)):
            Circle(WYTNIJ_WYCI_GNI_CIE5_OUTLINE_R)
        with Locations((475.23, 21.65)):
            Circle(WYTNIJ_WYCI_GNI_CIE5_OUTLINE_R)
    extrude(amount=WYTNIJ_WYCI_GNI_CIE5_DEPTH, mode=Mode.SUBTRACT)

    # Zaokrąglenie2
    zaokr_glenie2_edges = [part.edges().sort_by_distance(p)[0] for p in [
        (118.27, 19, -74.35),
        (142.27, 19, -74.35),
        (118.27, 19, -21.65),
        (142.27, 19, -21.65),
        (198.27, 19, -74.35),
        (222.27, 19, -74.35),
        (198.27, 19, -21.65),
        (222.27, 19, -21.65),
        (118.27, 19, -193.65),
        (118.27, 19, -246.35),
        (142.27, 19, -246.35),
        (142.27, 19, -193.65),
        (198.27, 19, -193.65),
        (198.27, 19, -246.35),
        (222.27, 19, -246.35),
        (222.27, 19, -193.65),
        (368.73, 19, -246.35),
        (392.73, 19, -246.35),
        (448.73, 19, -246.35),
        (472.73, 19, -246.35),
        (448.73, 19, -193.65),
        (472.73, 19, -193.65),
        (392.73, 19, -193.65),
        (368.73, 19, -193.65),
        (368.73, 19, -74.35),
        (392.73, 19, -74.35),
        (368.73, 19, -21.65),
        (392.73, 19, -21.65),
        (448.73, 19, -21.65),
        (448.73, 19, -74.35),
        (472.73, 19, -74.35),
        (472.73, 19, -21.65),
    ]]
    fillet(zaokr_glenie2_edges, radius=ZAOKR_GLENIE2_R)


solid = part.part
